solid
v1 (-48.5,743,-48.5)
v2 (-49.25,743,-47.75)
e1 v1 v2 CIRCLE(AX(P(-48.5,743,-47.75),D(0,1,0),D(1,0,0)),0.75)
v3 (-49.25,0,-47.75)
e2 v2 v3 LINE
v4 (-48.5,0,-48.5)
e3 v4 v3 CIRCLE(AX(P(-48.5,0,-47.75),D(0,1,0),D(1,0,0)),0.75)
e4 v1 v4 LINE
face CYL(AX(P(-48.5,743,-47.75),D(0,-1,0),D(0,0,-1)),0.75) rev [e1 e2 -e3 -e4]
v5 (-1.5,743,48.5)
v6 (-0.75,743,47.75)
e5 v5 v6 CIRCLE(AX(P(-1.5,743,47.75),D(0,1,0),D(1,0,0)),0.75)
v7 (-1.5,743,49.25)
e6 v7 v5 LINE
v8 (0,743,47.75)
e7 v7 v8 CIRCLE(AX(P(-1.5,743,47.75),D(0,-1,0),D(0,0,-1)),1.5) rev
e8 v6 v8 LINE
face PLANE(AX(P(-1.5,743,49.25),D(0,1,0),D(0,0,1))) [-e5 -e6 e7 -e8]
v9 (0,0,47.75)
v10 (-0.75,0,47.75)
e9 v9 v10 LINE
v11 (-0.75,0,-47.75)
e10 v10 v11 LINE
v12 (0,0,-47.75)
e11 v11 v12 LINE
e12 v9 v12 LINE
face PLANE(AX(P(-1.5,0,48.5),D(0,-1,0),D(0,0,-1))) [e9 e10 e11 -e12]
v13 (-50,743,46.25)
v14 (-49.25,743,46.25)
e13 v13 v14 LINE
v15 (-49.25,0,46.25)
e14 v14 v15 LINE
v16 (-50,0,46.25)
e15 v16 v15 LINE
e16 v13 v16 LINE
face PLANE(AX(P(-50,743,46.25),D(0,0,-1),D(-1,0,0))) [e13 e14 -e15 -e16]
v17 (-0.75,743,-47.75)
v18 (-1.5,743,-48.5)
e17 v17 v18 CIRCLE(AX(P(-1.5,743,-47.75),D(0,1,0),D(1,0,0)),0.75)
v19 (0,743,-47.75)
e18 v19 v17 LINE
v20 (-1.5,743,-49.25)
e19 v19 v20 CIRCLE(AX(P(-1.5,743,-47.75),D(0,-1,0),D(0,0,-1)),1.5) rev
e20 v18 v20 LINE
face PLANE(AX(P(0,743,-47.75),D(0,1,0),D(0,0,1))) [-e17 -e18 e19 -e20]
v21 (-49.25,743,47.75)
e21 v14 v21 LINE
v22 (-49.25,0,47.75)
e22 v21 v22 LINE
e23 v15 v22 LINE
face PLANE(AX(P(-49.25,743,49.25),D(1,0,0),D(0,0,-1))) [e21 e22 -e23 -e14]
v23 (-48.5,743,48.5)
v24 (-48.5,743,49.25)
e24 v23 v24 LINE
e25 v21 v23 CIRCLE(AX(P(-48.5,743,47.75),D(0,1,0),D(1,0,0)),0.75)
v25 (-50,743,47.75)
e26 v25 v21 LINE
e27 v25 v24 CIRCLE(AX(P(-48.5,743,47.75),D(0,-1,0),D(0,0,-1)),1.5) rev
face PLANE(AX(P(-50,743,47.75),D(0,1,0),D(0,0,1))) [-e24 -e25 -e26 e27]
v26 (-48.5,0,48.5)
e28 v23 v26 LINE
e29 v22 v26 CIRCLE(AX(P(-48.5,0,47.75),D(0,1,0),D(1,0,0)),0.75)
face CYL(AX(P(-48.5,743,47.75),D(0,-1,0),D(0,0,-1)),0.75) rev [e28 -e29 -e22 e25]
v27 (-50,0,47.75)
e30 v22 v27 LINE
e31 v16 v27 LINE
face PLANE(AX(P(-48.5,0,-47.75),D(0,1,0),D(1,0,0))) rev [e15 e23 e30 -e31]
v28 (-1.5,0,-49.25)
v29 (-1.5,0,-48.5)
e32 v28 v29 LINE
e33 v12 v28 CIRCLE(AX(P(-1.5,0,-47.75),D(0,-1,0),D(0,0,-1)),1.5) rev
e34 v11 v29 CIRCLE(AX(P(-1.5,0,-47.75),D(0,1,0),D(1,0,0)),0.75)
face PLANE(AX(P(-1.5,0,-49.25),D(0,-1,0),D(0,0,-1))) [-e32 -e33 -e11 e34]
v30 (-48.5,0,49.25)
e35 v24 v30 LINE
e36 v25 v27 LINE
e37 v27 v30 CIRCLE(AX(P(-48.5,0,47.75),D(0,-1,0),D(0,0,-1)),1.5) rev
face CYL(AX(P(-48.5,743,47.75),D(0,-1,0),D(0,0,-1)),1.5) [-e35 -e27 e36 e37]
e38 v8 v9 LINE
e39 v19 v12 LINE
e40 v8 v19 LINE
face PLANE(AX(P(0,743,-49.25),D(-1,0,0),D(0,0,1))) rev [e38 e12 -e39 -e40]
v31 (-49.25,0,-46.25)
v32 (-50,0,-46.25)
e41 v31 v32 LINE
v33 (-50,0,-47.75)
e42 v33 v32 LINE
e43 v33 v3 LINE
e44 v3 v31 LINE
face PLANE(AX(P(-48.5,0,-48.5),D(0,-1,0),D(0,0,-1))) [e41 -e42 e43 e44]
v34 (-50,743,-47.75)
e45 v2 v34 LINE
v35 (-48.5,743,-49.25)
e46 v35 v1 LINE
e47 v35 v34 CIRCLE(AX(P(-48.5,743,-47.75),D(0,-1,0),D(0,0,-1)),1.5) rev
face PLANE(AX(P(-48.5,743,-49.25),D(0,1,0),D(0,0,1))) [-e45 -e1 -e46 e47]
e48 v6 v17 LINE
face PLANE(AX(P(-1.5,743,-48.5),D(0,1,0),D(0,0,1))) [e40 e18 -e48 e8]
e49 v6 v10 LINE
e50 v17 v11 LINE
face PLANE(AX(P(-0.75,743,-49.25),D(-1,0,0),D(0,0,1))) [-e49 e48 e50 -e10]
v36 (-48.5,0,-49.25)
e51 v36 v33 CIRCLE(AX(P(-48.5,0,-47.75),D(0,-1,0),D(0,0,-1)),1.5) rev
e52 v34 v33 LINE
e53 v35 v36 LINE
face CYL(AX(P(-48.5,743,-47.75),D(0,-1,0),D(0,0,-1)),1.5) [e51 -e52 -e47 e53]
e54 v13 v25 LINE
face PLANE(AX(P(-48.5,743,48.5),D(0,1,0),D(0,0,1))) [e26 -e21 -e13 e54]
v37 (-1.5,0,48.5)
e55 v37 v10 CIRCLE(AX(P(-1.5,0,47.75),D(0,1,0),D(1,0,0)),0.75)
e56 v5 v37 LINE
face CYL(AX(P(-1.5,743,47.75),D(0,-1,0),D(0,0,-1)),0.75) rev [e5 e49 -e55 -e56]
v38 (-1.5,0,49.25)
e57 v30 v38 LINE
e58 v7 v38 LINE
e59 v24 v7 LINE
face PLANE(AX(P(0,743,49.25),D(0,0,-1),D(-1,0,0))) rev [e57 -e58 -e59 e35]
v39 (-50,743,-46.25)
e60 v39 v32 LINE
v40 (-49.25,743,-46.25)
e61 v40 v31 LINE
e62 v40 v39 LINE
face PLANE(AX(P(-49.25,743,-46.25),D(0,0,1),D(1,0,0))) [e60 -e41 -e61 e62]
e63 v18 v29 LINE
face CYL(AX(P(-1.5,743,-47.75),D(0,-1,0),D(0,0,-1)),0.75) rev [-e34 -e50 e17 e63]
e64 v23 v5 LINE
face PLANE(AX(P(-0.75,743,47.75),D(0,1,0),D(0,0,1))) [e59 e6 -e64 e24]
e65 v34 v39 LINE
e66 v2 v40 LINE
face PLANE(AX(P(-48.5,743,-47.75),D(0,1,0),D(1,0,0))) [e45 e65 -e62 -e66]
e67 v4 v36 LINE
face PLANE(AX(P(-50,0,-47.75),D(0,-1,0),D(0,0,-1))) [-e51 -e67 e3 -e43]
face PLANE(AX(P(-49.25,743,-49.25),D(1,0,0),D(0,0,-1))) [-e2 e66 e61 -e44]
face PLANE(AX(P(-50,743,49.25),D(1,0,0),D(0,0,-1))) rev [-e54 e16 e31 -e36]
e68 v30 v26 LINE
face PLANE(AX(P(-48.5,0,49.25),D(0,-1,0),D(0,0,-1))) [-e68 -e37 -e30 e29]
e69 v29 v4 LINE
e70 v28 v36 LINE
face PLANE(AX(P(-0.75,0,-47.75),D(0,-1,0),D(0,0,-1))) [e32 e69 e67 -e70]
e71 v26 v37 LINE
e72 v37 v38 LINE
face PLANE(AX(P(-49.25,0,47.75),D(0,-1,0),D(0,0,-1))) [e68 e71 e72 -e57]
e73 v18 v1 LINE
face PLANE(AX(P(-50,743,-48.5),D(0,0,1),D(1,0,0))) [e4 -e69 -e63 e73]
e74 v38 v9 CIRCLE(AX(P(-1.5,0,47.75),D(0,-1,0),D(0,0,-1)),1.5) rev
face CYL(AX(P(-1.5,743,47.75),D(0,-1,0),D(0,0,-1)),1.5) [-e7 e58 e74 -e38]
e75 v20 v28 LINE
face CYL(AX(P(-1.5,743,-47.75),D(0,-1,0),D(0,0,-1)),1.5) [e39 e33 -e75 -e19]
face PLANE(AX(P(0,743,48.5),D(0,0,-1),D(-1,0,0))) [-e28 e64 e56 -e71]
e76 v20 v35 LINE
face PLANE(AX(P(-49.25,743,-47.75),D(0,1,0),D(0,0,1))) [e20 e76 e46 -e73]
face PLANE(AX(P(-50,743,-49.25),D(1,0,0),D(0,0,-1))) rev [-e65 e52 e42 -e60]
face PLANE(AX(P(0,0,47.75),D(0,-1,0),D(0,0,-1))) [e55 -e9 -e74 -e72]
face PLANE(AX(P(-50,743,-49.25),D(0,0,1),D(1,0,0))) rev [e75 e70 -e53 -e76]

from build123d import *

# Parameters (mm, degrees)
SM_BASE_FLANGE_1_DEPTH = 743


# Sheet-metal steps are written as plain solids
with BuildPart() as part:
    # Sketch 1 → Базовая кромка1 (new body)
    with BuildSketch(Plane(origin=(0, 0, 0), x_dir=(1, 0, 0), z_dir=(0, 1, 0))):
        with BuildLine():
            Line((-50, 46.25), (-50, 47.75))
            ThreePointArc((-50, 47.75), (-49.560660172, 48.810660172), (-48.5, 49.25))
            Line((-48.5, 49.25), (-1.5, 49.25))
            ThreePointArc((-1.5, 49.25), (-0.439339828, 48.810660172), (0, 47.75))
            Line((0, 47.75), (0, -47.75))
            ThreePointArc((0, -47.75), (-0.439339828, -48.810660172), (-1.5, -49.25))
            Line((-1.5, -49.25), (-48.5, -49.25))
            ThreePointArc((-48.5, -49.25), (-49.560660172, -48.810660172), (-50, -47.75))
            Line((-50, -47.75), (-50, -46.25))
            Line((-50, -46.25), (-49.25, -46.25))
            Line((-49.25, -46.25), (-49.25, -47.75))
            ThreePointArc((-49.25, -47.75), (-49.030330086, -48.280330086), (-48.5, -48.5))
            Line((-48.5, -48.5), (-1.5, -48.5))
            ThreePointArc((-1.5, -48.5), (-0.969669914, -48.280330086), (-0.75, -47.75))
            Line((-0.75, -47.75), (-0.75, 47.75))
            ThreePointArc((-0.75, 47.75), (-0.969669914, 48.280330086), (-1.5, 48.5))
            Line((-1.5, 48.5), (-48.5, 48.5))
            ThreePointArc((-48.5, 48.5), (-49.030330086, 48.280330086), (-49.25, 47.75))
            Line((-49.25, 47.75), (-49.25, 46.25))
            Line((-49.25, 46.25), (-50, 46.25))
        make_face()
    extrude(amount=SM_BASE_FLANGE_1_DEPTH)


solid = part.part
